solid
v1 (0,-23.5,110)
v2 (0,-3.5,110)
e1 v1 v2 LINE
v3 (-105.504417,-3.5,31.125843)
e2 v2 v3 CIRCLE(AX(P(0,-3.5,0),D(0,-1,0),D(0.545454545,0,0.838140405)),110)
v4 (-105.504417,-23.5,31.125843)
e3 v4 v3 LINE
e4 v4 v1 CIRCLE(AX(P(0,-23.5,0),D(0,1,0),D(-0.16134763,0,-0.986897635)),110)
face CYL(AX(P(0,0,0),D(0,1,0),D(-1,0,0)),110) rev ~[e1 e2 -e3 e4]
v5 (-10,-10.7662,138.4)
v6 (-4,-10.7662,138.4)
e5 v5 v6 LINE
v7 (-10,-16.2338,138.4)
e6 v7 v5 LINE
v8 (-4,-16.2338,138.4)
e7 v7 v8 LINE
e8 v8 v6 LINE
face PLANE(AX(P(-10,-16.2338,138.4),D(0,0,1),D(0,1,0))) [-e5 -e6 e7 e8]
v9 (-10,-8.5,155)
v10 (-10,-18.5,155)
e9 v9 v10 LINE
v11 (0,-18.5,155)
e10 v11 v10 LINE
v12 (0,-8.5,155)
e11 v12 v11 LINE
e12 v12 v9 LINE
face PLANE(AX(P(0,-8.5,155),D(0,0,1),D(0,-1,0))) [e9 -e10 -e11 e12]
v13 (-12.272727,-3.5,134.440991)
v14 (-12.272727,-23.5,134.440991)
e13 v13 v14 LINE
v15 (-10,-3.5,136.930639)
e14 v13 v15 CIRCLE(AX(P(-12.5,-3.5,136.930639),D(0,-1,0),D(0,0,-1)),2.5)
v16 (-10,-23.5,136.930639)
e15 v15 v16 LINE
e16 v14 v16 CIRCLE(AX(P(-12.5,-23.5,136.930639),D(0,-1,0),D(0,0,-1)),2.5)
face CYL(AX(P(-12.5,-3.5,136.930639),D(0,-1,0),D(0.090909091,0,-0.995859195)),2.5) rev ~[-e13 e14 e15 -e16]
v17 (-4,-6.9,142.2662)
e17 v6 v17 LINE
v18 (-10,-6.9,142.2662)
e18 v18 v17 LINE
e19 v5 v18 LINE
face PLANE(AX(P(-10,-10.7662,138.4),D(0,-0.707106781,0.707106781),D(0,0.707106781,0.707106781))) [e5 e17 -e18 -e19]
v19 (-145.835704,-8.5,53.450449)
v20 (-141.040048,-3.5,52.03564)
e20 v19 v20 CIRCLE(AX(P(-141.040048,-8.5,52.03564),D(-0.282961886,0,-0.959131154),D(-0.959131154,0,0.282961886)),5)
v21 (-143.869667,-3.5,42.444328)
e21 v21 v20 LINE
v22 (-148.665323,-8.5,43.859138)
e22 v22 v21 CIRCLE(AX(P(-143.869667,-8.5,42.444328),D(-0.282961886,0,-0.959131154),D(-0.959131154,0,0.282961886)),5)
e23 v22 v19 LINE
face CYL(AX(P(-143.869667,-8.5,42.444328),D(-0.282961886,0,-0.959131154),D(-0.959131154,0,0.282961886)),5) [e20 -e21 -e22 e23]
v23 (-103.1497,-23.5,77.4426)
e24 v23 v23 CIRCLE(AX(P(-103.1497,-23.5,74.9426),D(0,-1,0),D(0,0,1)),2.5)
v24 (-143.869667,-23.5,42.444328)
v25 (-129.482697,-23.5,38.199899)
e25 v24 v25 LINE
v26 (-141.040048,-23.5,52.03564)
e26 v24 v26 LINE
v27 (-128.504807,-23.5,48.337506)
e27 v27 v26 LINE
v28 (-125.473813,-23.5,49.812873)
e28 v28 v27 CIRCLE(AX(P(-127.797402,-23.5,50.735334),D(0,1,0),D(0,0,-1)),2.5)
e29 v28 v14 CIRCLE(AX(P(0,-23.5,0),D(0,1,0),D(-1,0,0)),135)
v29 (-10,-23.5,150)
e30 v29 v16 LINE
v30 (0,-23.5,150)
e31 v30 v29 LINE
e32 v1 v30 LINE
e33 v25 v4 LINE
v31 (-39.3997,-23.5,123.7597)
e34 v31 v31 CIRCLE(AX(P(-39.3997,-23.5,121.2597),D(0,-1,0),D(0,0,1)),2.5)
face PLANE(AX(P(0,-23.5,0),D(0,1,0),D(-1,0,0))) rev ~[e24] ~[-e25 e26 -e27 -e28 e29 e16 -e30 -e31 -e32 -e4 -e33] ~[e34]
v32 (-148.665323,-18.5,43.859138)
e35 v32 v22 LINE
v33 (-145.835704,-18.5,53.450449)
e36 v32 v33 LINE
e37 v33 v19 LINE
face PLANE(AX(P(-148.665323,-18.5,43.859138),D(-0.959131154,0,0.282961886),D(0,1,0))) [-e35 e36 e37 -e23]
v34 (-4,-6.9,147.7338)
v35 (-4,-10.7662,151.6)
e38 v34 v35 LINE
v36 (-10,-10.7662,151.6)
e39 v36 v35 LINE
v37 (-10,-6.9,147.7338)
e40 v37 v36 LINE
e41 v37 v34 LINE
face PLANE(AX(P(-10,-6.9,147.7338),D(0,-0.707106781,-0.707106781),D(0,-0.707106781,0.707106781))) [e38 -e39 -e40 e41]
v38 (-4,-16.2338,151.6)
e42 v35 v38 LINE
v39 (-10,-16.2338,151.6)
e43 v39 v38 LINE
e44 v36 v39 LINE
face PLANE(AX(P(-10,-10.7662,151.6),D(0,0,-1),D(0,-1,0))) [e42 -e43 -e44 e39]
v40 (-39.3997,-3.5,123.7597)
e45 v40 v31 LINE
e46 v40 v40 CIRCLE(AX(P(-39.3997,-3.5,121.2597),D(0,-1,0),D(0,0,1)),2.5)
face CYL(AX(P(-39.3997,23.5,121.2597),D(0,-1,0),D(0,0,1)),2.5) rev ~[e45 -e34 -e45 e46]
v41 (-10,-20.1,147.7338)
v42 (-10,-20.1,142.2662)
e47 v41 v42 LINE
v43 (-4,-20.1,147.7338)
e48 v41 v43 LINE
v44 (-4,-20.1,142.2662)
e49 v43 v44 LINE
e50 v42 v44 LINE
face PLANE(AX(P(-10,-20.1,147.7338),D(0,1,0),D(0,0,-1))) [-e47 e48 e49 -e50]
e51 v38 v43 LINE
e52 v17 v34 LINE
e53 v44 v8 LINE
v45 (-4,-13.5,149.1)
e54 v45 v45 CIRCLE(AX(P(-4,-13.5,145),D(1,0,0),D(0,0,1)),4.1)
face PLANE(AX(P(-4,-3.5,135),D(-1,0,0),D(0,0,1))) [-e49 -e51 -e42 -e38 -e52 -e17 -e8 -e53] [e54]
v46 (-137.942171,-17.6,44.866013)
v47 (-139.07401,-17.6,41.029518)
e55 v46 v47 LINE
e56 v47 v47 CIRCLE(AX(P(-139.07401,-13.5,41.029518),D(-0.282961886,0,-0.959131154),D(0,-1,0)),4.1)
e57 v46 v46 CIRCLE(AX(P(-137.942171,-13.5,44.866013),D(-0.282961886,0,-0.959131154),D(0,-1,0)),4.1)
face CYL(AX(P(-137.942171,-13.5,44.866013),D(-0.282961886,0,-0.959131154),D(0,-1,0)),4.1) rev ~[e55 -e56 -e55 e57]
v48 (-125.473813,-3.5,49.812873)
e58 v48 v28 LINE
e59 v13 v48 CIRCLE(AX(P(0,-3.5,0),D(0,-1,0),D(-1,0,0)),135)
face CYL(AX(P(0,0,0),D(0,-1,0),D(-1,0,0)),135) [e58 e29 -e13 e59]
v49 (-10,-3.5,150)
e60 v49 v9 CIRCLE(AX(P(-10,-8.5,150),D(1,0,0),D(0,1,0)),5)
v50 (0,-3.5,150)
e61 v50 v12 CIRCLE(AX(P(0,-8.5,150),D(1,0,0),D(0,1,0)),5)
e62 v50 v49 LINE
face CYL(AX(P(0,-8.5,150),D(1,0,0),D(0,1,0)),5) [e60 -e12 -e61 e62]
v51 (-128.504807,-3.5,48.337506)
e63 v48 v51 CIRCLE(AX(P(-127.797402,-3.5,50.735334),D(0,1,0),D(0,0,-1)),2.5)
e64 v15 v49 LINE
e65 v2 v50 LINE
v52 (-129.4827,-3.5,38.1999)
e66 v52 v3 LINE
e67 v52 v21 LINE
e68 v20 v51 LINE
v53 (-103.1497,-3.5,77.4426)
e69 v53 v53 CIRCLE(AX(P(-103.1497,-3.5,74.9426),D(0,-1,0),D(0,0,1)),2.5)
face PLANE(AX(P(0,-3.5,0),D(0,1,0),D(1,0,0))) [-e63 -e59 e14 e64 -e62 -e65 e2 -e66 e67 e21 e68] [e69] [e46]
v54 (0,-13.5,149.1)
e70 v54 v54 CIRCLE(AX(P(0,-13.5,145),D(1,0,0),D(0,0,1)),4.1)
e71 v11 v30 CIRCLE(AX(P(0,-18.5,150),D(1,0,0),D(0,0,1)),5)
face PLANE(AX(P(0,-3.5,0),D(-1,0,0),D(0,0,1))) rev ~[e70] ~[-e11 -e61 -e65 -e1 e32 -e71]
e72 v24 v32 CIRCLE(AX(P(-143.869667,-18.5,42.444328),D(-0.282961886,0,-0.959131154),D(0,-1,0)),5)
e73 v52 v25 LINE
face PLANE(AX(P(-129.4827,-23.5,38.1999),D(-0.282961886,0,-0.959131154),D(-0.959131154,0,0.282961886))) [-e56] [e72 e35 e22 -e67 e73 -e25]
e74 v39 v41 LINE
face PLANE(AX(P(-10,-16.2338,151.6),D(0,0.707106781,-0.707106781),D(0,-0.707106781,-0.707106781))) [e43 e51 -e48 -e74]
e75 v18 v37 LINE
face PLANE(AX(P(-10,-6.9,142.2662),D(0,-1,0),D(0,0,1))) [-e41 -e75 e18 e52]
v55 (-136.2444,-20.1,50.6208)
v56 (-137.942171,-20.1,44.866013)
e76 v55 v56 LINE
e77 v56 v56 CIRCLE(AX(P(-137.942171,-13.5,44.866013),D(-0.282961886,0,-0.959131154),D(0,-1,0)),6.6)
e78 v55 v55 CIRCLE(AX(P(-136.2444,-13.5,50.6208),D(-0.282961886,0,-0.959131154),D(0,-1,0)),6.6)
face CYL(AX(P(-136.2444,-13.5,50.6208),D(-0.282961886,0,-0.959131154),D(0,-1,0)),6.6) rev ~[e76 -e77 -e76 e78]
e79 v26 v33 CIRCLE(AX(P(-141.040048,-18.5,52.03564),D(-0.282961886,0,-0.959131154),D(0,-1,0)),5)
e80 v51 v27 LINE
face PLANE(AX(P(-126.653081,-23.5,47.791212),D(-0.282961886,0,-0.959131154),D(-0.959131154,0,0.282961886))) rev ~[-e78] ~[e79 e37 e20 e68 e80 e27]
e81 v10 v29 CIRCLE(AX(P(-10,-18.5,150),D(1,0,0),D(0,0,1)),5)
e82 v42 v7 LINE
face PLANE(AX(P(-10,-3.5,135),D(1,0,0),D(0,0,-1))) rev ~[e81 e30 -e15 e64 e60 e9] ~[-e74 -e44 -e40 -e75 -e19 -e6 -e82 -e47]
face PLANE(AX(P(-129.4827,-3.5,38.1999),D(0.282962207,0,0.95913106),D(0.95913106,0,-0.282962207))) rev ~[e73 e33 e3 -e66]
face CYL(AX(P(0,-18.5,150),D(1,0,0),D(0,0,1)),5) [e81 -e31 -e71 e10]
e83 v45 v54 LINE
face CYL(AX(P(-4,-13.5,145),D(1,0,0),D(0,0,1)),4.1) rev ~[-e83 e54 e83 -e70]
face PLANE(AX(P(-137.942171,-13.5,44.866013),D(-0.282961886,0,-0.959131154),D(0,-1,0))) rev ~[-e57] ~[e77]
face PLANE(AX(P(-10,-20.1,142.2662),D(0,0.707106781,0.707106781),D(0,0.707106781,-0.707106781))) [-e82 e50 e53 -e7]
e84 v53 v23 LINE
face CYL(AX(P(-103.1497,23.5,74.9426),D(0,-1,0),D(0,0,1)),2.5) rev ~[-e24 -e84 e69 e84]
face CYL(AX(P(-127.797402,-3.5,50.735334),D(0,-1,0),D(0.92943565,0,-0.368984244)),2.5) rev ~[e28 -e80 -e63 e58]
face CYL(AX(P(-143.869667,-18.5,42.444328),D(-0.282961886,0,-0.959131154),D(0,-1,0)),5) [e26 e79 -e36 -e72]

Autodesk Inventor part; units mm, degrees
ref_plane "YZ Plane" through (0, 0, 0) normal (1, 0, 0) x (0, 1, 0)
ref_plane "XZ Plane" through (0, 0, 0) normal (0, 1, 0) x (-1, 0, 0)
ref_plane "XY Plane" through (0, 0, 0) normal (0, 0, 1) x (1, 0, 0)
sketch "Sketch1" plane through (0, 0, 0) normal (0, 1, 0) x (-1, 0, 0)
  circle A0 centre (0, 0) radius 135
  circle A1 centre (0, 0) radius 110
  dimension "d0" = 270
  dimension "d1" = 220
extrude "Extrusion1" add sketch "Sketch1" along normal mid plane 47
sketch "Sketch2" plane through (0, 0, 0) normal (0, 0, 1) x (1, 0, 0)
  circle A0 centre (0, -20.5) radius 18
  line L0 (-135, -23.5) -> (135, -23.5) projected
  dimension "d4" = 36
  dimension "d38" = 3
extrude "Extrusion2" cut sketch "Sketch2" against normal through all
sketch "Sketch3" plane through (0, 23.5, 0) normal (0, 1, 0) x (1, 0, 0)
  circle A0 centre (0, 0) radius 127.5
  circle A1 centre (-127.5, 0) radius 2
  circle A2 centre (-103.1497, -74.9426) radius 2
  circle A3 centre (-39.3997, -121.2597) radius 2
  circle A4 centre (39.3997, -121.2597) radius 2
  circle A5 centre (103.1497, -74.9426) radius 2
  circle A6 centre (127.5, 0) radius 2
  circle A7 centre (103.1497, 74.9426) radius 2
  circle A8 centre (39.3997, 121.2597) radius 2
  circle A9 centre (-39.3997, 121.2597) radius 2
  circle A10 centre (-103.1497, 74.9426) radius 2
  dimension "d7" = 255
  dimension "d8" = 4
  dimension "d11" = 360
hole "Hole1" at (39.3997, 23.5, 121.2597) at (-39.3997, 23.5, 121.2597) at (-103.1497, 23.5, 74.9426) at (-127.5, 23.5, 0) at (-103.1497, 23.5, -74.9426) at (-39.3997, 23.5, -121.2597) at (39.3997, 23.5, -121.2597) at (103.1497, 23.5, -74.9426) at (127.5, 23.5, 0) at (103.1497, 23.5, 74.9426) direction (0, -1, 0) diameter 5 end through all
sketch "Sketch4" plane through (0, 23.5, 0) normal (0, 1, 0) x (1, 0, 0)
  circle A0 centre (0, 0) radius 140
extrude "Extrusion3" cut sketch "Sketch4" against normal blind 27
sketch "Sketch7" plane through (0, -3.5, 0) normal (0, 1, 0) x (1, 0, 0)
  line L0 (0, 0) -> (70, 0)
  line L1 (80, -100) -> (60, -100)
  line L2 (60, -100) -> (60, 100)
  line L3 (60, 100) -> (80, 100)
  line L4 (80, 100) -> (80, -100)
  line L5 (80, -100) -> (60, 100) construction
  line L6 (60, -100) -> (80, 100) construction
  dimension "d39" = 70
  dimension "d40" = 20
  dimension "d41" = 200
extrude "Extrusion7" cut sketch "Sketch7" against normal blind 15
sketch "Sketch8" plane through (0, -3.5, 0) normal (0, 1, 0) x (1, 0, 0)
  line L0 (-129.4827, -38.1999) -> (129.4827, 38.1999)
  line L1 (0, 134.8703) -> (0, -135)
  arc A0 (-5.9161, 134.8703) -> (5.9161, 134.8703) centre (0, 0) ccw projected
  arc A1 (5.9161, 134.8703) -> (-5.9161, 134.8703) centre (0, 0) ccw
  point P0 (5.9161, 134.8703)
  point P1 (0, 0)
extrude "Extrusion8" cut sketch "Sketch8" against normal through all contours A0 A1 L0 | L0 A0 L1 picked at (87.5063, 20.3809)
sketch "Sketch9" plane through (-129.4827, -23.5, 38.1999) normal (-0.2829619, 0, -0.9591312) x (-0.9591312, 0, 0.2829619)
  line L0 (-96.8001, 0) -> (0, 0) projected
  line L1 (-2.5, 0) -> (15, 0)
  line L2 (20, 5) -> (20, 15)
  line L3 (15, 20) -> (-2.5, 20)
  line L4 (-2.5, 20) -> (-2.5, 0)
  line L5 (0, 20) -> (0, 0) projected
  arc A0 (20, 15) -> (15, 20) centre (15, 15) ccw
  arc A1 (15, 0) -> (20, 5) centre (15, 5) ccw
  point P0 (-135, 23.5)
  point P1 (20, 20)
  point P2 (20, 0)
  dimension "d46" = 22.5
  dimension "d47" = 20
  dimension "d48" = 20
  dimension "d49" = 5
extrude "Extrusion9" add sketch "Sketch9" against normal blind 10
fillet "Fillet1" radius 2.5 1 edges at (-126.2974, -13.5, 47.6862)
sketch "Sketch10" plane through (-126.6531, -23.5, 47.7912) normal (0.2829619, 0, 0.9591312) x (0.9591312, 0, -0.2829619)
  line L0 (-20, 15) -> (-20, 5) projected
  line L1 (-1.9306, 20) -> (-15, 20) projected
  point P0 (135, 23.5)
  point P1 (-10, 10)
  dimension "d53" = 10
  dimension "d54" = 10
hole "Hole2" at (-136.2444, -13.5, 50.6208) direction (-0.2829619, 0, -0.9591312) diameter 8.2 end through all counterbore diameter 13.2 counterbore depth 6
sketch "Sketch11" plane through (0, -3.5, 135) normal (1, 0, 0) x (0, 0, -1)
  line L0 (2.5, 0) -> (-15, 0)
  line L1 (-20, -5) -> (-20, -15)
  line L2 (-15, -20) -> (2.5, -20)
  line L3 (2.5, -20) -> (2.5, 0)
  line L4 (0, -20) -> (0, 0) projected
  arc A0 (-15, 0) -> (-20, -5) centre (-15, -5) ccw
  arc A1 (-20, -15) -> (-15, -20) centre (-15, -15) ccw
  point P0 (135, 3.5)
  point P1 (-20, -20)
  point P2 (-20, 0)
  dimension "d62" = 22.5
  dimension "d63" = 20
  dimension "d64" = 20
  dimension "d65" = 5
extrude "Extrusion10" add sketch "Sketch11" against normal blind 10
fillet "Fillet2" radius 2.5 1 edges at (-10, -13.5, 134.6291)
sketch "Sketch12" plane through (-10, -3.5, 135) normal (-1, 0, 0) x (0, 0, 1)
  line L0 (16.6, -12.7338) -> (12.7338, -16.6)
  line L1 (12.7338, -16.6) -> (7.2662, -16.6)
  line L2 (7.2662, -16.6) -> (3.4, -12.7338)
  line L3 (3.4, -12.7338) -> (3.4, -7.2662)
  line L4 (3.4, -7.2662) -> (7.2662, -3.4)
  line L5 (7.2662, -3.4) -> (12.7338, -3.4)
  line L6 (12.7338, -3.4) -> (16.6, -7.2662)
  line L7 (16.6, -7.2662) -> (16.6, -12.7338)
  line L8 (1.9306, -20) -> (15, -20) projected
  line L9 (20, -15) -> (20, -5) projected
  point P0 (-135, 3.5)
  point P1 (10, -10)
  dimension "d69" = 10
  dimension "d70" = 10
  dimension "d71" = 13.2
extrude "Extrusion11" cut sketch "Sketch12" against normal blind 6
sketch "Sketch13" plane through (-4, -3.5, 135) normal (-1, 0, 0) x (0, 0, 1)
  line L0 (20, -15) -> (20, -5) projected
  point P0 (-135, 3.5)
  point P1 (10, -10)
  dimension "d74" = 10
hole "Hole3" at (-4, -13.5, 145) direction (1, 0, 0) diameter 8.2 end through all
properties part number "Cylinder Spacer Bottom_Q4"
